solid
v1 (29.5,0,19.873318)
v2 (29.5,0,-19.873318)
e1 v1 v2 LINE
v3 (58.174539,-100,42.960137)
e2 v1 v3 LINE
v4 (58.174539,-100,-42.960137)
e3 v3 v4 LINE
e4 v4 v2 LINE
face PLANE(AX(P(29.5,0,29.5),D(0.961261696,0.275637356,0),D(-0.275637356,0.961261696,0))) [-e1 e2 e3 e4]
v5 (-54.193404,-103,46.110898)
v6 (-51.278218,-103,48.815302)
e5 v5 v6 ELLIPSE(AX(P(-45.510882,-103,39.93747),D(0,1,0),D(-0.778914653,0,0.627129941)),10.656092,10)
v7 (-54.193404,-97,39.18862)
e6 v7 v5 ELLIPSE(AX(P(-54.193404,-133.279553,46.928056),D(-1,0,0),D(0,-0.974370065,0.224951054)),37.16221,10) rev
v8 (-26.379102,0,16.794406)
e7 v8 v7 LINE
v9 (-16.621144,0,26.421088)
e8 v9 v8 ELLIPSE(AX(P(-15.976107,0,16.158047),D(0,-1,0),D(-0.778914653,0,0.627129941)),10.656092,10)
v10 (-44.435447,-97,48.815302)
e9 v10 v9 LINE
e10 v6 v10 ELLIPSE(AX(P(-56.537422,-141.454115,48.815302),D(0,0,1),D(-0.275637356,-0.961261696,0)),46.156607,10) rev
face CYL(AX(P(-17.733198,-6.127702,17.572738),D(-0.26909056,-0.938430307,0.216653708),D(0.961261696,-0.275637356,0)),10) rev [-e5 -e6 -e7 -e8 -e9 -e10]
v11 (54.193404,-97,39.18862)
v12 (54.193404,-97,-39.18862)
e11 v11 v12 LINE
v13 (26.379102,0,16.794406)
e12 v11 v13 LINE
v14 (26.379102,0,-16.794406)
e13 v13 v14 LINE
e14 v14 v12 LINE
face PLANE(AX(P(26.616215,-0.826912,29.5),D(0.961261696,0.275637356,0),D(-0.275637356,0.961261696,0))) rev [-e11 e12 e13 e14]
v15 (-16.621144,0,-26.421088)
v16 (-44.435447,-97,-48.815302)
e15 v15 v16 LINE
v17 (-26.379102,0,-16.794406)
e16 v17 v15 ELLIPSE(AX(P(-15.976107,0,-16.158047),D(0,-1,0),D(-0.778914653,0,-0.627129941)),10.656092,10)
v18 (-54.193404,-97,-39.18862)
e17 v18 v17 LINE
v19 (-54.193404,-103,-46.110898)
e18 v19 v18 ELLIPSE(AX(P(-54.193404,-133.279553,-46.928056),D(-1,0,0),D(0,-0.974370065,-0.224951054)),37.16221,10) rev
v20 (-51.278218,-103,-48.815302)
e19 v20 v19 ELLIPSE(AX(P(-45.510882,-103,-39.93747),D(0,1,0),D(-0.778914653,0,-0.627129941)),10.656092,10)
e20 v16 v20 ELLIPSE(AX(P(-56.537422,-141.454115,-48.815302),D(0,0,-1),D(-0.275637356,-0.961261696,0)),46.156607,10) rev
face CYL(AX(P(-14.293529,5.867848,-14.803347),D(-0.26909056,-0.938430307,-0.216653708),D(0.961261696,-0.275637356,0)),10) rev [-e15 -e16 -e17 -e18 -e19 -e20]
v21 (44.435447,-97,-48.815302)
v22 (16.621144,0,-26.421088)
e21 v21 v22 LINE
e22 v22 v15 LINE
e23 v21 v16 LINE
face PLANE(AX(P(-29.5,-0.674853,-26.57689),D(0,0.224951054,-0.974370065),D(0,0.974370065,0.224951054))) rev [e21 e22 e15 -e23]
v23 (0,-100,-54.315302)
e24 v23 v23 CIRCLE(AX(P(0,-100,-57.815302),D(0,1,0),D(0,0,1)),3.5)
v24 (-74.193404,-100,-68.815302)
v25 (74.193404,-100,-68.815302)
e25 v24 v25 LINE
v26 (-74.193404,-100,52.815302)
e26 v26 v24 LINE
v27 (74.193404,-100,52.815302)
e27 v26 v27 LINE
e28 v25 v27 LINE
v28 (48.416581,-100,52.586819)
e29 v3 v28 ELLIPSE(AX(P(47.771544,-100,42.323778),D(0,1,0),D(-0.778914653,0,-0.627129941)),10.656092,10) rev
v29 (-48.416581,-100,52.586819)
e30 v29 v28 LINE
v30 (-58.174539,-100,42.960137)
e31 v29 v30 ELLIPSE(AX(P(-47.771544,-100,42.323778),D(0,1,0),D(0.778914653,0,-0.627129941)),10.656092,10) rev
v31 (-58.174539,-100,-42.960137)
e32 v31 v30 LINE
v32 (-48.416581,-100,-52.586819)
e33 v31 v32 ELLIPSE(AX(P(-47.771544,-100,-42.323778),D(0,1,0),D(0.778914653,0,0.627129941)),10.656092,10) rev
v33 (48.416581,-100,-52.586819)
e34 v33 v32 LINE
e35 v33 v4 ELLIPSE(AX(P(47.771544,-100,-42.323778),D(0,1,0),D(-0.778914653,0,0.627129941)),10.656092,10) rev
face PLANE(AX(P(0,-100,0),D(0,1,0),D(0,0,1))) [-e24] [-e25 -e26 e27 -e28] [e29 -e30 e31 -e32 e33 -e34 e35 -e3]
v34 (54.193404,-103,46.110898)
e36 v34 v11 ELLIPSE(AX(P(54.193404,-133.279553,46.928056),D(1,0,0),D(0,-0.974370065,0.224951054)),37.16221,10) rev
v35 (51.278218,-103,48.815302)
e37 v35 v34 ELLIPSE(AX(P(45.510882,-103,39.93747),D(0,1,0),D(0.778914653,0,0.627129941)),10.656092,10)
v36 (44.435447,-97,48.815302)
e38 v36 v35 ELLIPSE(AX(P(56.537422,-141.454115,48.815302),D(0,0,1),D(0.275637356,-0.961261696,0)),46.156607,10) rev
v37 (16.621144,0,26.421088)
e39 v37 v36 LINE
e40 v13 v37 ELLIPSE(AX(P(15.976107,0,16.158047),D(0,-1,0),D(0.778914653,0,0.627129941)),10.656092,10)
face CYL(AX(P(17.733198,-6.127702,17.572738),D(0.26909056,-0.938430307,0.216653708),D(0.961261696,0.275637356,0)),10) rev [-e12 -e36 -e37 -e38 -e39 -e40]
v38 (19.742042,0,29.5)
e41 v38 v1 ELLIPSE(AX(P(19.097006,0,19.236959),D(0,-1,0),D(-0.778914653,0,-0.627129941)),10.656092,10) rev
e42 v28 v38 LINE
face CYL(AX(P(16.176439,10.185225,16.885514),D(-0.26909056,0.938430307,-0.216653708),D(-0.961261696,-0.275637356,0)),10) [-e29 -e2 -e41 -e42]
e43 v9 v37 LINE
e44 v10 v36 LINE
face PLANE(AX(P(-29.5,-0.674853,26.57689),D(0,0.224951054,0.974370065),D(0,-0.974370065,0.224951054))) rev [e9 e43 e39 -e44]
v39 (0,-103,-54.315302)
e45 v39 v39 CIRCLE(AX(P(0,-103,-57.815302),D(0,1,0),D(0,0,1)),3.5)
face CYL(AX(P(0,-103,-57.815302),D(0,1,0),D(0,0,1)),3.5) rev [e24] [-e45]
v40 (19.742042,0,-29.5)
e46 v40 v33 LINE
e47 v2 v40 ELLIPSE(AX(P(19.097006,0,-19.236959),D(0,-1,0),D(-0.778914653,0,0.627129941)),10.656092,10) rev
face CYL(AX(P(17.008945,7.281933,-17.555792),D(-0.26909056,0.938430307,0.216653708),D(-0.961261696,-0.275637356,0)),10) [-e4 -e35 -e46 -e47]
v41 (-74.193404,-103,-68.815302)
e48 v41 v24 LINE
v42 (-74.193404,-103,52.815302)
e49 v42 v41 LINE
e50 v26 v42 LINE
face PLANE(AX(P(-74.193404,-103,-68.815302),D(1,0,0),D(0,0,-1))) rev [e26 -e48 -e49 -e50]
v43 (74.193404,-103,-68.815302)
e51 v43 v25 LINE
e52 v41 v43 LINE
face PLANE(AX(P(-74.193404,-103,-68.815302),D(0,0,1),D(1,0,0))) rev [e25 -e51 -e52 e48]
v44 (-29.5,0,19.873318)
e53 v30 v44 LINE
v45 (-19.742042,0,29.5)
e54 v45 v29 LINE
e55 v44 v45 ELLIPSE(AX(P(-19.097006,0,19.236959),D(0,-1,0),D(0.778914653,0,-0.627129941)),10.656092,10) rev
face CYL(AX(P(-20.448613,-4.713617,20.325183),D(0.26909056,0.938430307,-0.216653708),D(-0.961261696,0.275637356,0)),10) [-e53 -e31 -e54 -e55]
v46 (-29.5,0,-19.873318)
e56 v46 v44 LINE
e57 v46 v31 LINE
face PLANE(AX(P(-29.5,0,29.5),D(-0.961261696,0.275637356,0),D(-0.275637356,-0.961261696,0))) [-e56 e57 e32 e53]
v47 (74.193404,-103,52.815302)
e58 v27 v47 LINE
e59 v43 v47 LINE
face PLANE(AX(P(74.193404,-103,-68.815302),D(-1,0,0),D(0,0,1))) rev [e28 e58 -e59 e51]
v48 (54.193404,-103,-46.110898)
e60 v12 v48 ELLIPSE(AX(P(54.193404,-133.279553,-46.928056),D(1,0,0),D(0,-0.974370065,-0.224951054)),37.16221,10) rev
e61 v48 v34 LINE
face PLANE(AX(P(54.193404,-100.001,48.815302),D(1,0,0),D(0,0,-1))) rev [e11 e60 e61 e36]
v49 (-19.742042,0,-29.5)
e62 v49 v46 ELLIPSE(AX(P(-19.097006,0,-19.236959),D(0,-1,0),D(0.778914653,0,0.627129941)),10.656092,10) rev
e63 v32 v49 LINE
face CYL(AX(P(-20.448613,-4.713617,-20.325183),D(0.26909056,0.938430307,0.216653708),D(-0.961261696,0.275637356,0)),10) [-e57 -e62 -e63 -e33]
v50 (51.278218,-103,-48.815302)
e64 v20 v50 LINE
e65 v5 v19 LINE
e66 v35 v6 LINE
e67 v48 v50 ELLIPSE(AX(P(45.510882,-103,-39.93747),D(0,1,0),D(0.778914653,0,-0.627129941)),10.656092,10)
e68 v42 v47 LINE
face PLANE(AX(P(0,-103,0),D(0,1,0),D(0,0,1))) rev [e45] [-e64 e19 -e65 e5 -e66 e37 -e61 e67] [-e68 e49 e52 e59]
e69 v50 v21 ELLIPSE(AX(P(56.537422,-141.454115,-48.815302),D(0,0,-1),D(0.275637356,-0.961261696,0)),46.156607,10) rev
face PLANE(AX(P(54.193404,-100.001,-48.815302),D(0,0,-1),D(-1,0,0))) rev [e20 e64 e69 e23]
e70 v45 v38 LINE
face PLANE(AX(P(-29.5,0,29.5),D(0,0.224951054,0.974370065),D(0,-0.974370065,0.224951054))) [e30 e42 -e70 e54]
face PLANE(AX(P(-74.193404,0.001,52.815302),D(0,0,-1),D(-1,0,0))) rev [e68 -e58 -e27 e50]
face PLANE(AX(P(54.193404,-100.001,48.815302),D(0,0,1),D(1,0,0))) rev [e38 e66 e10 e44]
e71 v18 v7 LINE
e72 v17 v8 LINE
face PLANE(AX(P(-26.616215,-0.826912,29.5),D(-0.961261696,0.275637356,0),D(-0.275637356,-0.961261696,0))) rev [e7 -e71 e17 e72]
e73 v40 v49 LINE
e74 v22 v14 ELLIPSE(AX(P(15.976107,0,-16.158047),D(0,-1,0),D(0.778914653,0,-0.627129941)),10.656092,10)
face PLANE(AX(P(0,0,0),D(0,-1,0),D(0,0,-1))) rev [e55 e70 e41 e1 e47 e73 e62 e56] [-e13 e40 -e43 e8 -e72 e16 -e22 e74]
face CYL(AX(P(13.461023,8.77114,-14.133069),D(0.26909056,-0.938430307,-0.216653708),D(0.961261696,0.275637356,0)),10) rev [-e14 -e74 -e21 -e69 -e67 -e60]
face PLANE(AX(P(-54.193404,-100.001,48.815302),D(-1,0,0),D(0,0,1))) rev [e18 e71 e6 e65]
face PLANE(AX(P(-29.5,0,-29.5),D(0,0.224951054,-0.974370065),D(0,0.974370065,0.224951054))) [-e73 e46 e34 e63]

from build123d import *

# Parameters (mm, degrees)
SKETCH1_W           = 59
SKETCH1_H           = 59
BOSS_EXTRUDE1_DEPTH = 100
DRAFT1_ANGLE        = 13
DRAFT2_ANGLE        = 16
SHELL1_T            = -3
CUT_EXTRUDE3_REACH  = 126.734
SKETCH7_W           = 108.386808222
SKETCH7_H           = 97.630604432
SKETCH8_W           = 148.386808222
SKETCH8_H           = 137.630604432
SKETCH8_W_2         = 108.386808222
SKETCH8_H_2         = 97.630604432
BOSS_EXTRUDE7_DEPTH = 3
FILLET5_R           = 10
SKETCH9_R           = 3.5
CUT_EXTRUDE4_DEPTH  = 3
CUT_EXTRUDE5_REACH  = 146.393
SKETCH10_W          = 148.386808222
SKETCH10_H          = 16


with BuildPart() as part:
    # Sketch1 → Boss-Extrude1 (new body)
    with BuildSketch(Plane(origin=(0, 0, 0), x_dir=(1, 0, 0), z_dir=(0, 1, 0))):
        Rectangle(SKETCH1_W, SKETCH1_H)
    extrude(amount=-BOSS_EXTRUDE1_DEPTH)

    # Draft1
    draft1_faces = [part.faces().sort_by_distance(p)[0] for p in [
        (0, -50, 29.5),
        (0, -50, -29.5),
    ]]
    draft(draft1_faces, Plane.ZX, DRAFT1_ANGLE)

    # Draft2
    draft2_faces = [part.faces().sort_by_distance(p)[0] for p in [
        (-29.5, -54.687479947, 0),
        (29.5, -54.687479947, 0),
    ]]
    draft(draft2_faces, Plane.ZX, DRAFT2_ANGLE)

    # Shell1
    shell1_openings = [part.faces().sort_by_distance(p)[0] for p in [
        (0, 0, 0),
    ]]
    offset(amount=SHELL1_T, openings=shell1_openings, kind=Kind.INTERSECTION)

    # Sketch7 → Cut-Extrude3 (cut, up to next)
    with BuildSketch(Plane(origin=(0, -97, 0), x_dir=(1, 0, 0), z_dir=(0, 1, 0)), mode=Mode.PRIVATE) as cut_extrude3_sk1:
        Rectangle(SKETCH7_W, SKETCH7_H)
    cut_extrude3_tool1 = extrude(cut_extrude3_sk1.sketch, amount=-CUT_EXTRUDE3_REACH, mode=Mode.PRIVATE) & part.part
    add(cut_extrude3_tool1.solids().sort_by_distance((0, -97, 0))[0], mode=Mode.SUBTRACT)

    # Sketch8 → Boss-Extrude7 (add)
    with BuildSketch(Plane.XZ.offset(100)):
        Rectangle(SKETCH8_W, SKETCH8_H)
        Rectangle(SKETCH8_W_2, SKETCH8_H_2, mode=Mode.SUBTRACT)
    extrude(amount=BOSS_EXTRUDE7_DEPTH)

    # Fillet5
    # the kernel refuses this fillet: 10 mm, written as the material it adds along each edge
    with BuildSketch(Plane(origin=(60.515709798, -119.048500171, 53.905599567), x_dir=(0.05971785506372287, -0.20826091030442337, -0.9762485190901757), z_dir=(-0.26909056042227797, 0.9384303071178944, -0.2166537075017155))) as fillet5_piece_1_section:
        with BuildLine():
            CenterArc((FILLET5_R * 0.939803414436, FILLET5_R), FILLET5_R, 183.554900224, 86.445099776)
            Line((-FILLET5_R * 0.0582724297082, FILLET5_R * 0.937995086192), (0, 0))
            Line((0, 0), (FILLET5_R * 0.939803414436, 0))
        make_face()
    fillet5_piece_1 = extrude(amount=150.354266344, mode=Mode.PRIVATE)
    fillet5_piece_1 = split(fillet5_piece_1, bisect_by=Plane(origin=(38.566536387, -103, 35.845693728), z_dir=(0, 1, 0)), keep=Keep.TOP, mode=Mode.PRIVATE)
    fillet5_piece_1 = split(fillet5_piece_1, bisect_by=Plane(origin=(38.566536387, 0, 35.845693728), z_dir=(0, -1, 0)), keep=Keep.TOP, mode=Mode.PRIVATE)
    add(fillet5_piece_1)
    with BuildSketch(Plane(origin=(60.515709798, -119.048500171, -53.905599567), x_dir=(0.059717855063722874, -0.2082609103044234, 0.9762485190901756), z_dir=(-0.26909056042227797, 0.9384303071178944, 0.2166537075017155))) as fillet5_piece_2_section:
        with BuildLine():
            CenterArc((FILLET5_R * 0.939803414436, -FILLET5_R), FILLET5_R, 90, 86.445099776)
            Line((-FILLET5_R * 0.0582724297082, -FILLET5_R * 0.937995086192), (0, 0))
            Line((0, 0), (FILLET5_R * 0.939803414436, 0))
        make_face()
    fillet5_piece_2 = extrude(amount=150.354266344, mode=Mode.PRIVATE)
    fillet5_piece_2 = split(fillet5_piece_2, bisect_by=Plane(origin=(38.566536387, -103, -35.845693728), z_dir=(0, 1, 0)), keep=Keep.TOP, mode=Mode.PRIVATE)
    fillet5_piece_2 = split(fillet5_piece_2, bisect_by=Plane(origin=(38.566536387, 0, -35.845693728), z_dir=(0, -1, 0)), keep=Keep.TOP, mode=Mode.PRIVATE)
    add(fillet5_piece_2)
    with BuildSketch(Plane(origin=(-60.515709798, -119.048500171, -53.905599567), x_dir=(0.9631148790729092, -0.26219378679175015, -0.06053220528097297), z_dir=(0.26909056042227797, 0.9384303071178944, 0.2166537075017155))) as fillet5_piece_3_section:
        with BuildLine():
            CenterArc((FILLET5_R * 0.939803414436, -FILLET5_R), FILLET5_R, 90, 86.445099776)
            Line((-FILLET5_R * 0.0582724297082, -FILLET5_R * 0.937995086192), (0, 0))
            Line((0, 0), (FILLET5_R * 0.939803414436, 0))
        make_face()
    fillet5_piece_3 = extrude(amount=150.354266344, mode=Mode.PRIVATE)
    fillet5_piece_3 = split(fillet5_piece_3, bisect_by=Plane(origin=(-38.566536387, -103, -35.845693728), z_dir=(0, 1, 0)), keep=Keep.TOP, mode=Mode.PRIVATE)
    fillet5_piece_3 = split(fillet5_piece_3, bisect_by=Plane(origin=(-38.566536387, 0, -35.845693728), z_dir=(0, -1, 0)), keep=Keep.TOP, mode=Mode.PRIVATE)
    add(fillet5_piece_3)
    with BuildSketch(Plane(origin=(-20.056796005, 22.048500171, 21.330790325), x_dir=(-0.059717855063722264, -0.2082609103044235, -0.9762485190901756), z_dir=(-0.26909056042227797, -0.9384303071178944, 0.2166537075017155))) as fillet5_piece_4_section:
        with BuildLine():
            CenterArc((FILLET5_R * 0.939803414436, FILLET5_R), FILLET5_R, 183.554900224, 86.445099776)
            Line((-FILLET5_R * 0.0582724297082, FILLET5_R * 0.937995086192), (0, 0))
            Line((0, 0), (FILLET5_R * 0.939803414436, 0))
        make_face()
    fillet5_piece_4 = extrude(amount=150.354266344, mode=Mode.PRIVATE)
    fillet5_piece_4 = split(fillet5_piece_4, bisect_by=Plane(origin=(-38.566536387, -103, 35.845693728), z_dir=(0, 1, 0)), keep=Keep.TOP, mode=Mode.PRIVATE)
    fillet5_piece_4 = split(fillet5_piece_4, bisect_by=Plane(origin=(-38.566536387, 0, 35.845693728), z_dir=(0, -1, 0)), keep=Keep.TOP, mode=Mode.PRIVATE)
    add(fillet5_piece_4)
    # the kernel refuses this fillet: 10 mm, written as the material it takes off along each edge
    with BuildSketch(Plane(origin=(-23.177694313, 22.048500171, -24.409702648), x_dir=(-0.05971785506372238, -0.20826091030442354, 0.9762485190901757), z_dir=(-0.26909056042227797, -0.9384303071178944, -0.2166537075017155))) as fillet5_2_piece_1_section:
        with BuildLine():
            CenterArc((FILLET5_R * 0.939803414436, -FILLET5_R), FILLET5_R, 90, 86.445099776)
            Line((-FILLET5_R * 0.0582724297082, -FILLET5_R * 0.937995086192), (0, 0))
            Line((0, 0), (FILLET5_R * 0.939803414436, 0))
        make_face()
    fillet5_2_piece_1 = extrude(amount=153.551094044, mode=Mode.PRIVATE)
    fillet5_2_piece_1 = split(fillet5_2_piece_1, bisect_by=Plane(origin=(-41.676990214, -100, -38.91219309), z_dir=(0, 1, 0)), keep=Keep.TOP, mode=Mode.PRIVATE)
    add(fillet5_2_piece_1, mode=Mode.SUBTRACT)
    with BuildSketch(Plane(origin=(23.177694313, 22.048500171, -24.409702648), x_dir=(0.059717855063722375, -0.2082609103044235, 0.9762485190901756), z_dir=(0.26909056042227797, -0.9384303071178944, -0.2166537075017155))) as fillet5_2_piece_2_section:
        with BuildLine():
            CenterArc((FILLET5_R * 0.939803414436, FILLET5_R), FILLET5_R, 183.554900224, 86.445099776)
            Line((-FILLET5_R * 0.0582724297082, FILLET5_R * 0.937995086192), (0, 0))
            Line((0, 0), (FILLET5_R * 0.939803414436, 0))
        make_face()
    fillet5_2_piece_2 = extrude(amount=153.551094044, mode=Mode.PRIVATE)
    fillet5_2_piece_2 = split(fillet5_2_piece_2, bisect_by=Plane(origin=(41.676990214, -100, -38.91219309), z_dir=(0, 1, 0)), keep=Keep.TOP, mode=Mode.PRIVATE)
    add(fillet5_2_piece_2, mode=Mode.SUBTRACT)
    with BuildSketch(Plane(origin=(23.177694313, 22.048500171, 24.409702648), x_dir=(-0.9631148790729092, -0.26219378679175015, 0.06053220528097312), z_dir=(0.26909056042227797, -0.9384303071178944, 0.2166537075017155))) as fillet5_2_piece_3_section:
        with BuildLine():
            CenterArc((FILLET5_R * 0.939803414436, FILLET5_R), FILLET5_R, 183.554900224, 86.445099776)
            Line((-FILLET5_R * 0.0582724297082, FILLET5_R * 0.937995086192), (0, 0))
            Line((0, 0), (FILLET5_R * 0.939803414436, 0))
        make_face()
    fillet5_2_piece_3 = extrude(amount=153.551094044, mode=Mode.PRIVATE)
    fillet5_2_piece_3 = split(fillet5_2_piece_3, bisect_by=Plane(origin=(41.676990214, -100, 38.91219309), z_dir=(0, 1, 0)), keep=Keep.TOP, mode=Mode.PRIVATE)
    add(fillet5_2_piece_3, mode=Mode.SUBTRACT)
    with BuildSketch(Plane(origin=(-23.177694313, 22.048500171, 24.409702648), x_dir=(0.9631148790729092, -0.26219378679175015, 0.06053220528097312), z_dir=(-0.26909056042227797, -0.9384303071178944, 0.2166537075017155))) as fillet5_2_piece_4_section:
        with BuildLine():
            CenterArc((FILLET5_R * 0.939803414436, -FILLET5_R), FILLET5_R, 90, 86.445099776)
            Line((-FILLET5_R * 0.0582724297082, -FILLET5_R * 0.937995086192), (0, 0))
            Line((0, 0), (FILLET5_R * 0.939803414436, 0))
        make_face()
    fillet5_2_piece_4 = extrude(amount=153.551094044, mode=Mode.PRIVATE)
    fillet5_2_piece_4 = split(fillet5_2_piece_4, bisect_by=Plane(origin=(-41.676990214, -100, 38.91219309), z_dir=(0, 1, 0)), keep=Keep.TOP, mode=Mode.PRIVATE)
    add(fillet5_2_piece_4, mode=Mode.SUBTRACT)

    # Sketch9 → Cut-Extrude4 (cut)
    with BuildSketch(Plane(origin=(0, -100, 0), x_dir=(1, 0, 0), z_dir=(0, 1, 0))):
        with Locations(Location((0, 57.815302216, 0), (0, 0, 270))):
            Circle(SKETCH9_R)
    extrude(amount=-CUT_EXTRUDE4_DEPTH, mode=Mode.SUBTRACT)

    # Sketch10 → Cut-Extrude5 (cut, up to next)
    with BuildSketch(Plane.XZ.offset(103), mode=Mode.PRIVATE) as cut_extrude5_sk1:
        with Locations((0, 60.815302216)):
            Rectangle(SKETCH10_W, SKETCH10_H)
    cut_extrude5_tool1 = extrude(cut_extrude5_sk1.sketch, amount=-CUT_EXTRUDE5_REACH, mode=Mode.PRIVATE) & part.part
    add(cut_extrude5_tool1.solids().sort_by_distance((0, -103, 60.815302))[0], mode=Mode.SUBTRACT)


solid = part.part
